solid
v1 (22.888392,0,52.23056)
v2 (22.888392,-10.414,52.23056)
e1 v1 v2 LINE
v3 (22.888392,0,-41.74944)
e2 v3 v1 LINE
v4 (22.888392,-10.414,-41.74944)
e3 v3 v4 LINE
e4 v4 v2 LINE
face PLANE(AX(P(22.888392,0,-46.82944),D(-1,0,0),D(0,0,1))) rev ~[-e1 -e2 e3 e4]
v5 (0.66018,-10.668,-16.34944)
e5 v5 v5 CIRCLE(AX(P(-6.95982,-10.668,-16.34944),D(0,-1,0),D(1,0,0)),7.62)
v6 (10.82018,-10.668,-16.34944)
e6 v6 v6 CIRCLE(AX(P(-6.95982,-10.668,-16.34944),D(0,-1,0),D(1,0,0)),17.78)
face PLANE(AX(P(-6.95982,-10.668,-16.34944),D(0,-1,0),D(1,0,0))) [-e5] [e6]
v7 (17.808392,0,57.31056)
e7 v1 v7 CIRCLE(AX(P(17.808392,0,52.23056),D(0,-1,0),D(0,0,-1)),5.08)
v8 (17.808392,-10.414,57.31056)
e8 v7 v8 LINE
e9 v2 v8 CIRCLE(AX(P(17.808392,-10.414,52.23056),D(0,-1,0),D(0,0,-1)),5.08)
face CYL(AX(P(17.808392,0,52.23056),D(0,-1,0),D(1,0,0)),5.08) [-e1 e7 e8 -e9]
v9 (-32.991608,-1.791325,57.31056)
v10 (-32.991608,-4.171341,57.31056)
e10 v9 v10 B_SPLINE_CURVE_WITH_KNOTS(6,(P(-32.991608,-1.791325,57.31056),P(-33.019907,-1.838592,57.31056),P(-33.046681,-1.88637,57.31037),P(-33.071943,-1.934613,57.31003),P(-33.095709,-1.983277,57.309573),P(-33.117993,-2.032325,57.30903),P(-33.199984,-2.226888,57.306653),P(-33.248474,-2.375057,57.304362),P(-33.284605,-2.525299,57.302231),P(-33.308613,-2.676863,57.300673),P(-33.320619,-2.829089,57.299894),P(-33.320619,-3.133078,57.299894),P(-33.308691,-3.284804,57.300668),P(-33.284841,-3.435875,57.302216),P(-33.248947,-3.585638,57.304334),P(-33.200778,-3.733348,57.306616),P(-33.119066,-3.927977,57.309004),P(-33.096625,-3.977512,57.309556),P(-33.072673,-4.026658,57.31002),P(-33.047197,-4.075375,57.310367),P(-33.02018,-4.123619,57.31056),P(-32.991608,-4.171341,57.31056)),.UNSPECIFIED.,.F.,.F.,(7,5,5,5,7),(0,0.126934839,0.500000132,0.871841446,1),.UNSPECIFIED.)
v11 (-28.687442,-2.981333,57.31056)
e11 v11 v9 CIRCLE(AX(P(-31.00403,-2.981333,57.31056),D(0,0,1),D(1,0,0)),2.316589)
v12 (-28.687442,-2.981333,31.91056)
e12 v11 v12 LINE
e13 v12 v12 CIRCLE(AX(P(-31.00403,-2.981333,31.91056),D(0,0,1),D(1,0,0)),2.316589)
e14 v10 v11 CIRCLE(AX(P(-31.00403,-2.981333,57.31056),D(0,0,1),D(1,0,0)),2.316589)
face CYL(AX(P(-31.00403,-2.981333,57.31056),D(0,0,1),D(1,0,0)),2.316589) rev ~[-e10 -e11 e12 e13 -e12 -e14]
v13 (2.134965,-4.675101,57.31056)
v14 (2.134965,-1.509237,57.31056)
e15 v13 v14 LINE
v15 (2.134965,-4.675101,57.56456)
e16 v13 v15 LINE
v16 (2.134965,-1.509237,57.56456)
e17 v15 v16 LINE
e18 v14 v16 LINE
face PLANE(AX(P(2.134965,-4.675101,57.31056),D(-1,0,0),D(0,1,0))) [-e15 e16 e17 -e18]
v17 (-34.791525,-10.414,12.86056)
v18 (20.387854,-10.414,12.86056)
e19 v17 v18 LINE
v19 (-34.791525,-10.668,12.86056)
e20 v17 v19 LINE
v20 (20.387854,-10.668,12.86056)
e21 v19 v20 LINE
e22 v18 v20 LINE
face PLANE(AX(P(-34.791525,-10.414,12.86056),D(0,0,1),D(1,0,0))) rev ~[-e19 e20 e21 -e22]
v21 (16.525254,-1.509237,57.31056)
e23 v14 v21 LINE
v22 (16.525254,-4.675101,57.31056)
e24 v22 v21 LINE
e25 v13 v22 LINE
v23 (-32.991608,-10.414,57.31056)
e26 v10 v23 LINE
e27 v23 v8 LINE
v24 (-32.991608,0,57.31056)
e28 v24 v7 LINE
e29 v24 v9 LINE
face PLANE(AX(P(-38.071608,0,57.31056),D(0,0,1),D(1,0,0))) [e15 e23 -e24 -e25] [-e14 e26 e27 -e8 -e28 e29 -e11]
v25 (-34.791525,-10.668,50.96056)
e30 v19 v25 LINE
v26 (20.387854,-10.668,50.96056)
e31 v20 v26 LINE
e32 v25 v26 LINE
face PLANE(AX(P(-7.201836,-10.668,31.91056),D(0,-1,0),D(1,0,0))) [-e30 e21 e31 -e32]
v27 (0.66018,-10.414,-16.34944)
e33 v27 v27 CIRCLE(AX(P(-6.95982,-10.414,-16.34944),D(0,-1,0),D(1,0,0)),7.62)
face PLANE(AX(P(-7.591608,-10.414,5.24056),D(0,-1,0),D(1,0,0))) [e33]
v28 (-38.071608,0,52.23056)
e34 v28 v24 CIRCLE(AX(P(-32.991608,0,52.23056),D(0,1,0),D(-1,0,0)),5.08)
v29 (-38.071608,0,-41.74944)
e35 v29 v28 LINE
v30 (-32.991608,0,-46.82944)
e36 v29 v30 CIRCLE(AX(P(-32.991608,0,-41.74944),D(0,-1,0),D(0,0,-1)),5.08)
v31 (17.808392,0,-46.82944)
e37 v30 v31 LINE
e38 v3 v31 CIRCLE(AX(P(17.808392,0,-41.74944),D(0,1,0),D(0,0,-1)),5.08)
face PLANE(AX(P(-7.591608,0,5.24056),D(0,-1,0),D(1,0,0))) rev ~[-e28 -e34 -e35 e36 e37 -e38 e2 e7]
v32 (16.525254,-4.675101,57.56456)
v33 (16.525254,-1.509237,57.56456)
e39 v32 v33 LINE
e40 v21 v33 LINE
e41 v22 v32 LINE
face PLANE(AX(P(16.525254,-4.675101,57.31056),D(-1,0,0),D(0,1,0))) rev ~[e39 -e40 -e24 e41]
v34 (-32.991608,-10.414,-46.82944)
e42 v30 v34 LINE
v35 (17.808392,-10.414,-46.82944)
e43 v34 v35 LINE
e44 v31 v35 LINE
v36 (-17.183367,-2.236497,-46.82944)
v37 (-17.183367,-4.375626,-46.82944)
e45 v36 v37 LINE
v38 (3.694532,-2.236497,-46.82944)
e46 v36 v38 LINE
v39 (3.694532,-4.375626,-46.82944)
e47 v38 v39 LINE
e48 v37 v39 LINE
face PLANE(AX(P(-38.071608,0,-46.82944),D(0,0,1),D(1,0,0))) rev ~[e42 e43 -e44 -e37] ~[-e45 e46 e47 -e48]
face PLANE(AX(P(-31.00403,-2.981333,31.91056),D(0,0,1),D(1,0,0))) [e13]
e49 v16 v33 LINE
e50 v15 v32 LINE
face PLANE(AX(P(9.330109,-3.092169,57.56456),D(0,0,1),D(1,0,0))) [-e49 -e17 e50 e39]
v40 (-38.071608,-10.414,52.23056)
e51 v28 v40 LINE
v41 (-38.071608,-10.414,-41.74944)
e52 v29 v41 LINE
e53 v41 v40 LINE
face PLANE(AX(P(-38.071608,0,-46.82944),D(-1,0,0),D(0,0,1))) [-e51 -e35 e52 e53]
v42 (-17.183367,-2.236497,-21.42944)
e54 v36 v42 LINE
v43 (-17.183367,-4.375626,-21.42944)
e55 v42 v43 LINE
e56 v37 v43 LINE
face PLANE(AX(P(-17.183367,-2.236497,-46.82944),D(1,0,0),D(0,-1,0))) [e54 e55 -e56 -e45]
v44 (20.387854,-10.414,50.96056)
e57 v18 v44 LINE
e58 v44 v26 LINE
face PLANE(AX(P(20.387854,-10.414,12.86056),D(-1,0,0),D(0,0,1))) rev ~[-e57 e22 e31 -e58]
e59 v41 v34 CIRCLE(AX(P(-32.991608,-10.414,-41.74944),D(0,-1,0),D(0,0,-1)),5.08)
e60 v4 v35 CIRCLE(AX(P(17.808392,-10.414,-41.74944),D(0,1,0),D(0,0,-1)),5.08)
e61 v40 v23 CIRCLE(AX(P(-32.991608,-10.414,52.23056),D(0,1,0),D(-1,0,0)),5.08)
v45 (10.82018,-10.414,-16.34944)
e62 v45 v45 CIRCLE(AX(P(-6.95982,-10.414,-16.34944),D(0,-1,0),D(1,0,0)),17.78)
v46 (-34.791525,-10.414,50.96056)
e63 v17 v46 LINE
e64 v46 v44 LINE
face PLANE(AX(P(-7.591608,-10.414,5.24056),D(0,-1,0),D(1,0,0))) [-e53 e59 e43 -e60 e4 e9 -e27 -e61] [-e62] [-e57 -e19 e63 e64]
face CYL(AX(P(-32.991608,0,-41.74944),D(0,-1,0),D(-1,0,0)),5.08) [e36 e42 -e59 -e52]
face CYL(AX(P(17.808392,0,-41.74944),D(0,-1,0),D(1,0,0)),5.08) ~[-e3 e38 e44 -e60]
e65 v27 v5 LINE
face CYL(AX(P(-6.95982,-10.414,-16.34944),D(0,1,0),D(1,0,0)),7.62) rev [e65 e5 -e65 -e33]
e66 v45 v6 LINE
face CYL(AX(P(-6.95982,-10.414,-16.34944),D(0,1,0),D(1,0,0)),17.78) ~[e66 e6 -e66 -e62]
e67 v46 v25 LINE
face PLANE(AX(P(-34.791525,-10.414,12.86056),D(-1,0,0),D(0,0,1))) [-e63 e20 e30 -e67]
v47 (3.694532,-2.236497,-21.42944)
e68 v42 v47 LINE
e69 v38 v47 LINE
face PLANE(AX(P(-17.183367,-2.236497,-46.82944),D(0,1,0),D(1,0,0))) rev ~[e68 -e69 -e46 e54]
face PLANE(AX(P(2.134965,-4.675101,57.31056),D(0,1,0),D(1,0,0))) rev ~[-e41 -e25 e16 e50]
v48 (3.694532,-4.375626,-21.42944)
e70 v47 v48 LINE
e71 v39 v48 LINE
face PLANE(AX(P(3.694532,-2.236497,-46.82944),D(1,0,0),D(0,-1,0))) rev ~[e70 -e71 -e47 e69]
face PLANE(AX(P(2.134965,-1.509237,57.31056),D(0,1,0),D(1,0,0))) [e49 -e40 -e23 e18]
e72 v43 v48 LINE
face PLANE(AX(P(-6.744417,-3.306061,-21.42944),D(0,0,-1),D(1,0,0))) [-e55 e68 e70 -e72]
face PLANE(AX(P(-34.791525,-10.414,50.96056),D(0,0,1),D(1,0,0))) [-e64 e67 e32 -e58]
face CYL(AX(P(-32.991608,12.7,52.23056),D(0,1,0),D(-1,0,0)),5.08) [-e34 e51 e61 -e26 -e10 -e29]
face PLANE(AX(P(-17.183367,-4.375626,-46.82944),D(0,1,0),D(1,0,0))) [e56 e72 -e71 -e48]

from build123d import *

# Parameters (mm, degrees)
F0_W         = 60.96
F0_H         = 104.14
F1_DEPTH     = 10.414
F3_R         = 17.78
F3_R_2       = 7.62
F4_DEPTH     = 0.254
F2_W         = 55.1793798804
F2_H         = 38.1
F5_DEPTH     = 0.254
F6_R         = 2.3165887379
F7_DEPTH     = 25.4
F8_W         = 14.3902888522
F8_H         = 3.1658638036
F9_DEPTH     = 0.254
F10_W        = 20.8778993692
F10_H        = 2.1391292103
F11_DEPTH    = 25.4
F12_R        = 5.08
F13_T1_DEPTH = 35.814
F14_R        = 5.08
F15_R        = 5.08


# Not quite as in the source:
# - a fillet or chamfer that OpenCascade refuses, or shapes differently, is made with other operations: its cross-section is extruded or revolved along the edge and cut away or added


with BuildPart() as f1:
    # F0 (on Front) → F1 (new body)
    with BuildSketch(Plane.XZ):
        with Locations((-7.5916079104, 5.2405595779)):
            Rectangle(F0_W, F0_H)
    extrude(amount=F1_DEPTH)

    # F3 (on face) → F4 (join)
    with BuildSketch(Plane.XZ.offset(10.414)):
        with Locations((-6.9598197006, -16.3494404221)):
            Circle(F3_R)
        with Locations((-6.9598197006, -16.3494404221)):
            Circle(F3_R_2, mode=Mode.SUBTRACT)
    extrude(amount=F4_DEPTH)

    # F2 (on face) → F5 (join)
    with BuildSketch(Plane.XZ.offset(10.414)):
        with Locations((-7.2018355131, 31.9105595779)):
            Rectangle(F2_W, F2_H)
    extrude(amount=F5_DEPTH)

    # F6 (on face) → F7 (cut)
    with BuildSketch(Plane.XY.offset(57.3105595779)):
        with Locations((-31.0040302575, -2.9813330621)):
            Circle(F6_R)
    extrude(amount=-F7_DEPTH, mode=Mode.SUBTRACT)

    # F8 (on face) → F9 (join)
    with BuildSketch(Plane.XY.offset(57.3105595779)):
        with Locations((9.3301092274, -3.0921686557)):
            Rectangle(F8_W, F8_H)
    extrude(amount=F9_DEPTH)

    # F10 (on face) → F11 (cut)
    with BuildSketch(Plane(origin=(0, 0, -46.8294404221), x_dir=(1, 0, 0), z_dir=(0, 0, -1))):
        with Locations((-6.7444174783, 3.3060612623)):
            Rectangle(F10_W, F10_H)
    extrude(amount=-F11_DEPTH, mode=Mode.SUBTRACT)

    # F12
    f12_edges = [f1.edges().sort_by_distance(p)[0] for p in [
        (-38.071608, -5.207, -46.82944),
    ]]
    fillet(f12_edges, radius=F12_R)

    # F13: fillet of radius 5.08 on 1 edges, made by hand

    # F13_s2 → F13_t1 (cut)
    with BuildSketch(Plane.XZ.offset(-12.7)):
        with BuildLine():
            ThreePointArc((-38.0716079104, 52.2305595779), (-36.5837103588, 55.8226620264), (-32.9916079104, 57.3105595779))
            Line((-32.9916079104, 57.3105595779), (-38.0716079104, 57.3105595779))
            Line((-38.0716079104, 57.3105595779), (-38.0716079104, 52.2305595779))
        make_face()
    extrude(amount=F13_T1_DEPTH, mode=Mode.SUBTRACT)

    # F14
    f14_edges = [f1.edges().sort_by_distance(p)[0] for p in [
        (22.888392, -5.207, -46.82944),
    ]]
    fillet(f14_edges, radius=F14_R)

    # F15
    f15_edges = [f1.edges().sort_by_distance(p)[0] for p in [
        (22.888392, -5.207, 57.31056),
    ]]
    fillet(f15_edges, radius=F15_R)


solid = f1.part
